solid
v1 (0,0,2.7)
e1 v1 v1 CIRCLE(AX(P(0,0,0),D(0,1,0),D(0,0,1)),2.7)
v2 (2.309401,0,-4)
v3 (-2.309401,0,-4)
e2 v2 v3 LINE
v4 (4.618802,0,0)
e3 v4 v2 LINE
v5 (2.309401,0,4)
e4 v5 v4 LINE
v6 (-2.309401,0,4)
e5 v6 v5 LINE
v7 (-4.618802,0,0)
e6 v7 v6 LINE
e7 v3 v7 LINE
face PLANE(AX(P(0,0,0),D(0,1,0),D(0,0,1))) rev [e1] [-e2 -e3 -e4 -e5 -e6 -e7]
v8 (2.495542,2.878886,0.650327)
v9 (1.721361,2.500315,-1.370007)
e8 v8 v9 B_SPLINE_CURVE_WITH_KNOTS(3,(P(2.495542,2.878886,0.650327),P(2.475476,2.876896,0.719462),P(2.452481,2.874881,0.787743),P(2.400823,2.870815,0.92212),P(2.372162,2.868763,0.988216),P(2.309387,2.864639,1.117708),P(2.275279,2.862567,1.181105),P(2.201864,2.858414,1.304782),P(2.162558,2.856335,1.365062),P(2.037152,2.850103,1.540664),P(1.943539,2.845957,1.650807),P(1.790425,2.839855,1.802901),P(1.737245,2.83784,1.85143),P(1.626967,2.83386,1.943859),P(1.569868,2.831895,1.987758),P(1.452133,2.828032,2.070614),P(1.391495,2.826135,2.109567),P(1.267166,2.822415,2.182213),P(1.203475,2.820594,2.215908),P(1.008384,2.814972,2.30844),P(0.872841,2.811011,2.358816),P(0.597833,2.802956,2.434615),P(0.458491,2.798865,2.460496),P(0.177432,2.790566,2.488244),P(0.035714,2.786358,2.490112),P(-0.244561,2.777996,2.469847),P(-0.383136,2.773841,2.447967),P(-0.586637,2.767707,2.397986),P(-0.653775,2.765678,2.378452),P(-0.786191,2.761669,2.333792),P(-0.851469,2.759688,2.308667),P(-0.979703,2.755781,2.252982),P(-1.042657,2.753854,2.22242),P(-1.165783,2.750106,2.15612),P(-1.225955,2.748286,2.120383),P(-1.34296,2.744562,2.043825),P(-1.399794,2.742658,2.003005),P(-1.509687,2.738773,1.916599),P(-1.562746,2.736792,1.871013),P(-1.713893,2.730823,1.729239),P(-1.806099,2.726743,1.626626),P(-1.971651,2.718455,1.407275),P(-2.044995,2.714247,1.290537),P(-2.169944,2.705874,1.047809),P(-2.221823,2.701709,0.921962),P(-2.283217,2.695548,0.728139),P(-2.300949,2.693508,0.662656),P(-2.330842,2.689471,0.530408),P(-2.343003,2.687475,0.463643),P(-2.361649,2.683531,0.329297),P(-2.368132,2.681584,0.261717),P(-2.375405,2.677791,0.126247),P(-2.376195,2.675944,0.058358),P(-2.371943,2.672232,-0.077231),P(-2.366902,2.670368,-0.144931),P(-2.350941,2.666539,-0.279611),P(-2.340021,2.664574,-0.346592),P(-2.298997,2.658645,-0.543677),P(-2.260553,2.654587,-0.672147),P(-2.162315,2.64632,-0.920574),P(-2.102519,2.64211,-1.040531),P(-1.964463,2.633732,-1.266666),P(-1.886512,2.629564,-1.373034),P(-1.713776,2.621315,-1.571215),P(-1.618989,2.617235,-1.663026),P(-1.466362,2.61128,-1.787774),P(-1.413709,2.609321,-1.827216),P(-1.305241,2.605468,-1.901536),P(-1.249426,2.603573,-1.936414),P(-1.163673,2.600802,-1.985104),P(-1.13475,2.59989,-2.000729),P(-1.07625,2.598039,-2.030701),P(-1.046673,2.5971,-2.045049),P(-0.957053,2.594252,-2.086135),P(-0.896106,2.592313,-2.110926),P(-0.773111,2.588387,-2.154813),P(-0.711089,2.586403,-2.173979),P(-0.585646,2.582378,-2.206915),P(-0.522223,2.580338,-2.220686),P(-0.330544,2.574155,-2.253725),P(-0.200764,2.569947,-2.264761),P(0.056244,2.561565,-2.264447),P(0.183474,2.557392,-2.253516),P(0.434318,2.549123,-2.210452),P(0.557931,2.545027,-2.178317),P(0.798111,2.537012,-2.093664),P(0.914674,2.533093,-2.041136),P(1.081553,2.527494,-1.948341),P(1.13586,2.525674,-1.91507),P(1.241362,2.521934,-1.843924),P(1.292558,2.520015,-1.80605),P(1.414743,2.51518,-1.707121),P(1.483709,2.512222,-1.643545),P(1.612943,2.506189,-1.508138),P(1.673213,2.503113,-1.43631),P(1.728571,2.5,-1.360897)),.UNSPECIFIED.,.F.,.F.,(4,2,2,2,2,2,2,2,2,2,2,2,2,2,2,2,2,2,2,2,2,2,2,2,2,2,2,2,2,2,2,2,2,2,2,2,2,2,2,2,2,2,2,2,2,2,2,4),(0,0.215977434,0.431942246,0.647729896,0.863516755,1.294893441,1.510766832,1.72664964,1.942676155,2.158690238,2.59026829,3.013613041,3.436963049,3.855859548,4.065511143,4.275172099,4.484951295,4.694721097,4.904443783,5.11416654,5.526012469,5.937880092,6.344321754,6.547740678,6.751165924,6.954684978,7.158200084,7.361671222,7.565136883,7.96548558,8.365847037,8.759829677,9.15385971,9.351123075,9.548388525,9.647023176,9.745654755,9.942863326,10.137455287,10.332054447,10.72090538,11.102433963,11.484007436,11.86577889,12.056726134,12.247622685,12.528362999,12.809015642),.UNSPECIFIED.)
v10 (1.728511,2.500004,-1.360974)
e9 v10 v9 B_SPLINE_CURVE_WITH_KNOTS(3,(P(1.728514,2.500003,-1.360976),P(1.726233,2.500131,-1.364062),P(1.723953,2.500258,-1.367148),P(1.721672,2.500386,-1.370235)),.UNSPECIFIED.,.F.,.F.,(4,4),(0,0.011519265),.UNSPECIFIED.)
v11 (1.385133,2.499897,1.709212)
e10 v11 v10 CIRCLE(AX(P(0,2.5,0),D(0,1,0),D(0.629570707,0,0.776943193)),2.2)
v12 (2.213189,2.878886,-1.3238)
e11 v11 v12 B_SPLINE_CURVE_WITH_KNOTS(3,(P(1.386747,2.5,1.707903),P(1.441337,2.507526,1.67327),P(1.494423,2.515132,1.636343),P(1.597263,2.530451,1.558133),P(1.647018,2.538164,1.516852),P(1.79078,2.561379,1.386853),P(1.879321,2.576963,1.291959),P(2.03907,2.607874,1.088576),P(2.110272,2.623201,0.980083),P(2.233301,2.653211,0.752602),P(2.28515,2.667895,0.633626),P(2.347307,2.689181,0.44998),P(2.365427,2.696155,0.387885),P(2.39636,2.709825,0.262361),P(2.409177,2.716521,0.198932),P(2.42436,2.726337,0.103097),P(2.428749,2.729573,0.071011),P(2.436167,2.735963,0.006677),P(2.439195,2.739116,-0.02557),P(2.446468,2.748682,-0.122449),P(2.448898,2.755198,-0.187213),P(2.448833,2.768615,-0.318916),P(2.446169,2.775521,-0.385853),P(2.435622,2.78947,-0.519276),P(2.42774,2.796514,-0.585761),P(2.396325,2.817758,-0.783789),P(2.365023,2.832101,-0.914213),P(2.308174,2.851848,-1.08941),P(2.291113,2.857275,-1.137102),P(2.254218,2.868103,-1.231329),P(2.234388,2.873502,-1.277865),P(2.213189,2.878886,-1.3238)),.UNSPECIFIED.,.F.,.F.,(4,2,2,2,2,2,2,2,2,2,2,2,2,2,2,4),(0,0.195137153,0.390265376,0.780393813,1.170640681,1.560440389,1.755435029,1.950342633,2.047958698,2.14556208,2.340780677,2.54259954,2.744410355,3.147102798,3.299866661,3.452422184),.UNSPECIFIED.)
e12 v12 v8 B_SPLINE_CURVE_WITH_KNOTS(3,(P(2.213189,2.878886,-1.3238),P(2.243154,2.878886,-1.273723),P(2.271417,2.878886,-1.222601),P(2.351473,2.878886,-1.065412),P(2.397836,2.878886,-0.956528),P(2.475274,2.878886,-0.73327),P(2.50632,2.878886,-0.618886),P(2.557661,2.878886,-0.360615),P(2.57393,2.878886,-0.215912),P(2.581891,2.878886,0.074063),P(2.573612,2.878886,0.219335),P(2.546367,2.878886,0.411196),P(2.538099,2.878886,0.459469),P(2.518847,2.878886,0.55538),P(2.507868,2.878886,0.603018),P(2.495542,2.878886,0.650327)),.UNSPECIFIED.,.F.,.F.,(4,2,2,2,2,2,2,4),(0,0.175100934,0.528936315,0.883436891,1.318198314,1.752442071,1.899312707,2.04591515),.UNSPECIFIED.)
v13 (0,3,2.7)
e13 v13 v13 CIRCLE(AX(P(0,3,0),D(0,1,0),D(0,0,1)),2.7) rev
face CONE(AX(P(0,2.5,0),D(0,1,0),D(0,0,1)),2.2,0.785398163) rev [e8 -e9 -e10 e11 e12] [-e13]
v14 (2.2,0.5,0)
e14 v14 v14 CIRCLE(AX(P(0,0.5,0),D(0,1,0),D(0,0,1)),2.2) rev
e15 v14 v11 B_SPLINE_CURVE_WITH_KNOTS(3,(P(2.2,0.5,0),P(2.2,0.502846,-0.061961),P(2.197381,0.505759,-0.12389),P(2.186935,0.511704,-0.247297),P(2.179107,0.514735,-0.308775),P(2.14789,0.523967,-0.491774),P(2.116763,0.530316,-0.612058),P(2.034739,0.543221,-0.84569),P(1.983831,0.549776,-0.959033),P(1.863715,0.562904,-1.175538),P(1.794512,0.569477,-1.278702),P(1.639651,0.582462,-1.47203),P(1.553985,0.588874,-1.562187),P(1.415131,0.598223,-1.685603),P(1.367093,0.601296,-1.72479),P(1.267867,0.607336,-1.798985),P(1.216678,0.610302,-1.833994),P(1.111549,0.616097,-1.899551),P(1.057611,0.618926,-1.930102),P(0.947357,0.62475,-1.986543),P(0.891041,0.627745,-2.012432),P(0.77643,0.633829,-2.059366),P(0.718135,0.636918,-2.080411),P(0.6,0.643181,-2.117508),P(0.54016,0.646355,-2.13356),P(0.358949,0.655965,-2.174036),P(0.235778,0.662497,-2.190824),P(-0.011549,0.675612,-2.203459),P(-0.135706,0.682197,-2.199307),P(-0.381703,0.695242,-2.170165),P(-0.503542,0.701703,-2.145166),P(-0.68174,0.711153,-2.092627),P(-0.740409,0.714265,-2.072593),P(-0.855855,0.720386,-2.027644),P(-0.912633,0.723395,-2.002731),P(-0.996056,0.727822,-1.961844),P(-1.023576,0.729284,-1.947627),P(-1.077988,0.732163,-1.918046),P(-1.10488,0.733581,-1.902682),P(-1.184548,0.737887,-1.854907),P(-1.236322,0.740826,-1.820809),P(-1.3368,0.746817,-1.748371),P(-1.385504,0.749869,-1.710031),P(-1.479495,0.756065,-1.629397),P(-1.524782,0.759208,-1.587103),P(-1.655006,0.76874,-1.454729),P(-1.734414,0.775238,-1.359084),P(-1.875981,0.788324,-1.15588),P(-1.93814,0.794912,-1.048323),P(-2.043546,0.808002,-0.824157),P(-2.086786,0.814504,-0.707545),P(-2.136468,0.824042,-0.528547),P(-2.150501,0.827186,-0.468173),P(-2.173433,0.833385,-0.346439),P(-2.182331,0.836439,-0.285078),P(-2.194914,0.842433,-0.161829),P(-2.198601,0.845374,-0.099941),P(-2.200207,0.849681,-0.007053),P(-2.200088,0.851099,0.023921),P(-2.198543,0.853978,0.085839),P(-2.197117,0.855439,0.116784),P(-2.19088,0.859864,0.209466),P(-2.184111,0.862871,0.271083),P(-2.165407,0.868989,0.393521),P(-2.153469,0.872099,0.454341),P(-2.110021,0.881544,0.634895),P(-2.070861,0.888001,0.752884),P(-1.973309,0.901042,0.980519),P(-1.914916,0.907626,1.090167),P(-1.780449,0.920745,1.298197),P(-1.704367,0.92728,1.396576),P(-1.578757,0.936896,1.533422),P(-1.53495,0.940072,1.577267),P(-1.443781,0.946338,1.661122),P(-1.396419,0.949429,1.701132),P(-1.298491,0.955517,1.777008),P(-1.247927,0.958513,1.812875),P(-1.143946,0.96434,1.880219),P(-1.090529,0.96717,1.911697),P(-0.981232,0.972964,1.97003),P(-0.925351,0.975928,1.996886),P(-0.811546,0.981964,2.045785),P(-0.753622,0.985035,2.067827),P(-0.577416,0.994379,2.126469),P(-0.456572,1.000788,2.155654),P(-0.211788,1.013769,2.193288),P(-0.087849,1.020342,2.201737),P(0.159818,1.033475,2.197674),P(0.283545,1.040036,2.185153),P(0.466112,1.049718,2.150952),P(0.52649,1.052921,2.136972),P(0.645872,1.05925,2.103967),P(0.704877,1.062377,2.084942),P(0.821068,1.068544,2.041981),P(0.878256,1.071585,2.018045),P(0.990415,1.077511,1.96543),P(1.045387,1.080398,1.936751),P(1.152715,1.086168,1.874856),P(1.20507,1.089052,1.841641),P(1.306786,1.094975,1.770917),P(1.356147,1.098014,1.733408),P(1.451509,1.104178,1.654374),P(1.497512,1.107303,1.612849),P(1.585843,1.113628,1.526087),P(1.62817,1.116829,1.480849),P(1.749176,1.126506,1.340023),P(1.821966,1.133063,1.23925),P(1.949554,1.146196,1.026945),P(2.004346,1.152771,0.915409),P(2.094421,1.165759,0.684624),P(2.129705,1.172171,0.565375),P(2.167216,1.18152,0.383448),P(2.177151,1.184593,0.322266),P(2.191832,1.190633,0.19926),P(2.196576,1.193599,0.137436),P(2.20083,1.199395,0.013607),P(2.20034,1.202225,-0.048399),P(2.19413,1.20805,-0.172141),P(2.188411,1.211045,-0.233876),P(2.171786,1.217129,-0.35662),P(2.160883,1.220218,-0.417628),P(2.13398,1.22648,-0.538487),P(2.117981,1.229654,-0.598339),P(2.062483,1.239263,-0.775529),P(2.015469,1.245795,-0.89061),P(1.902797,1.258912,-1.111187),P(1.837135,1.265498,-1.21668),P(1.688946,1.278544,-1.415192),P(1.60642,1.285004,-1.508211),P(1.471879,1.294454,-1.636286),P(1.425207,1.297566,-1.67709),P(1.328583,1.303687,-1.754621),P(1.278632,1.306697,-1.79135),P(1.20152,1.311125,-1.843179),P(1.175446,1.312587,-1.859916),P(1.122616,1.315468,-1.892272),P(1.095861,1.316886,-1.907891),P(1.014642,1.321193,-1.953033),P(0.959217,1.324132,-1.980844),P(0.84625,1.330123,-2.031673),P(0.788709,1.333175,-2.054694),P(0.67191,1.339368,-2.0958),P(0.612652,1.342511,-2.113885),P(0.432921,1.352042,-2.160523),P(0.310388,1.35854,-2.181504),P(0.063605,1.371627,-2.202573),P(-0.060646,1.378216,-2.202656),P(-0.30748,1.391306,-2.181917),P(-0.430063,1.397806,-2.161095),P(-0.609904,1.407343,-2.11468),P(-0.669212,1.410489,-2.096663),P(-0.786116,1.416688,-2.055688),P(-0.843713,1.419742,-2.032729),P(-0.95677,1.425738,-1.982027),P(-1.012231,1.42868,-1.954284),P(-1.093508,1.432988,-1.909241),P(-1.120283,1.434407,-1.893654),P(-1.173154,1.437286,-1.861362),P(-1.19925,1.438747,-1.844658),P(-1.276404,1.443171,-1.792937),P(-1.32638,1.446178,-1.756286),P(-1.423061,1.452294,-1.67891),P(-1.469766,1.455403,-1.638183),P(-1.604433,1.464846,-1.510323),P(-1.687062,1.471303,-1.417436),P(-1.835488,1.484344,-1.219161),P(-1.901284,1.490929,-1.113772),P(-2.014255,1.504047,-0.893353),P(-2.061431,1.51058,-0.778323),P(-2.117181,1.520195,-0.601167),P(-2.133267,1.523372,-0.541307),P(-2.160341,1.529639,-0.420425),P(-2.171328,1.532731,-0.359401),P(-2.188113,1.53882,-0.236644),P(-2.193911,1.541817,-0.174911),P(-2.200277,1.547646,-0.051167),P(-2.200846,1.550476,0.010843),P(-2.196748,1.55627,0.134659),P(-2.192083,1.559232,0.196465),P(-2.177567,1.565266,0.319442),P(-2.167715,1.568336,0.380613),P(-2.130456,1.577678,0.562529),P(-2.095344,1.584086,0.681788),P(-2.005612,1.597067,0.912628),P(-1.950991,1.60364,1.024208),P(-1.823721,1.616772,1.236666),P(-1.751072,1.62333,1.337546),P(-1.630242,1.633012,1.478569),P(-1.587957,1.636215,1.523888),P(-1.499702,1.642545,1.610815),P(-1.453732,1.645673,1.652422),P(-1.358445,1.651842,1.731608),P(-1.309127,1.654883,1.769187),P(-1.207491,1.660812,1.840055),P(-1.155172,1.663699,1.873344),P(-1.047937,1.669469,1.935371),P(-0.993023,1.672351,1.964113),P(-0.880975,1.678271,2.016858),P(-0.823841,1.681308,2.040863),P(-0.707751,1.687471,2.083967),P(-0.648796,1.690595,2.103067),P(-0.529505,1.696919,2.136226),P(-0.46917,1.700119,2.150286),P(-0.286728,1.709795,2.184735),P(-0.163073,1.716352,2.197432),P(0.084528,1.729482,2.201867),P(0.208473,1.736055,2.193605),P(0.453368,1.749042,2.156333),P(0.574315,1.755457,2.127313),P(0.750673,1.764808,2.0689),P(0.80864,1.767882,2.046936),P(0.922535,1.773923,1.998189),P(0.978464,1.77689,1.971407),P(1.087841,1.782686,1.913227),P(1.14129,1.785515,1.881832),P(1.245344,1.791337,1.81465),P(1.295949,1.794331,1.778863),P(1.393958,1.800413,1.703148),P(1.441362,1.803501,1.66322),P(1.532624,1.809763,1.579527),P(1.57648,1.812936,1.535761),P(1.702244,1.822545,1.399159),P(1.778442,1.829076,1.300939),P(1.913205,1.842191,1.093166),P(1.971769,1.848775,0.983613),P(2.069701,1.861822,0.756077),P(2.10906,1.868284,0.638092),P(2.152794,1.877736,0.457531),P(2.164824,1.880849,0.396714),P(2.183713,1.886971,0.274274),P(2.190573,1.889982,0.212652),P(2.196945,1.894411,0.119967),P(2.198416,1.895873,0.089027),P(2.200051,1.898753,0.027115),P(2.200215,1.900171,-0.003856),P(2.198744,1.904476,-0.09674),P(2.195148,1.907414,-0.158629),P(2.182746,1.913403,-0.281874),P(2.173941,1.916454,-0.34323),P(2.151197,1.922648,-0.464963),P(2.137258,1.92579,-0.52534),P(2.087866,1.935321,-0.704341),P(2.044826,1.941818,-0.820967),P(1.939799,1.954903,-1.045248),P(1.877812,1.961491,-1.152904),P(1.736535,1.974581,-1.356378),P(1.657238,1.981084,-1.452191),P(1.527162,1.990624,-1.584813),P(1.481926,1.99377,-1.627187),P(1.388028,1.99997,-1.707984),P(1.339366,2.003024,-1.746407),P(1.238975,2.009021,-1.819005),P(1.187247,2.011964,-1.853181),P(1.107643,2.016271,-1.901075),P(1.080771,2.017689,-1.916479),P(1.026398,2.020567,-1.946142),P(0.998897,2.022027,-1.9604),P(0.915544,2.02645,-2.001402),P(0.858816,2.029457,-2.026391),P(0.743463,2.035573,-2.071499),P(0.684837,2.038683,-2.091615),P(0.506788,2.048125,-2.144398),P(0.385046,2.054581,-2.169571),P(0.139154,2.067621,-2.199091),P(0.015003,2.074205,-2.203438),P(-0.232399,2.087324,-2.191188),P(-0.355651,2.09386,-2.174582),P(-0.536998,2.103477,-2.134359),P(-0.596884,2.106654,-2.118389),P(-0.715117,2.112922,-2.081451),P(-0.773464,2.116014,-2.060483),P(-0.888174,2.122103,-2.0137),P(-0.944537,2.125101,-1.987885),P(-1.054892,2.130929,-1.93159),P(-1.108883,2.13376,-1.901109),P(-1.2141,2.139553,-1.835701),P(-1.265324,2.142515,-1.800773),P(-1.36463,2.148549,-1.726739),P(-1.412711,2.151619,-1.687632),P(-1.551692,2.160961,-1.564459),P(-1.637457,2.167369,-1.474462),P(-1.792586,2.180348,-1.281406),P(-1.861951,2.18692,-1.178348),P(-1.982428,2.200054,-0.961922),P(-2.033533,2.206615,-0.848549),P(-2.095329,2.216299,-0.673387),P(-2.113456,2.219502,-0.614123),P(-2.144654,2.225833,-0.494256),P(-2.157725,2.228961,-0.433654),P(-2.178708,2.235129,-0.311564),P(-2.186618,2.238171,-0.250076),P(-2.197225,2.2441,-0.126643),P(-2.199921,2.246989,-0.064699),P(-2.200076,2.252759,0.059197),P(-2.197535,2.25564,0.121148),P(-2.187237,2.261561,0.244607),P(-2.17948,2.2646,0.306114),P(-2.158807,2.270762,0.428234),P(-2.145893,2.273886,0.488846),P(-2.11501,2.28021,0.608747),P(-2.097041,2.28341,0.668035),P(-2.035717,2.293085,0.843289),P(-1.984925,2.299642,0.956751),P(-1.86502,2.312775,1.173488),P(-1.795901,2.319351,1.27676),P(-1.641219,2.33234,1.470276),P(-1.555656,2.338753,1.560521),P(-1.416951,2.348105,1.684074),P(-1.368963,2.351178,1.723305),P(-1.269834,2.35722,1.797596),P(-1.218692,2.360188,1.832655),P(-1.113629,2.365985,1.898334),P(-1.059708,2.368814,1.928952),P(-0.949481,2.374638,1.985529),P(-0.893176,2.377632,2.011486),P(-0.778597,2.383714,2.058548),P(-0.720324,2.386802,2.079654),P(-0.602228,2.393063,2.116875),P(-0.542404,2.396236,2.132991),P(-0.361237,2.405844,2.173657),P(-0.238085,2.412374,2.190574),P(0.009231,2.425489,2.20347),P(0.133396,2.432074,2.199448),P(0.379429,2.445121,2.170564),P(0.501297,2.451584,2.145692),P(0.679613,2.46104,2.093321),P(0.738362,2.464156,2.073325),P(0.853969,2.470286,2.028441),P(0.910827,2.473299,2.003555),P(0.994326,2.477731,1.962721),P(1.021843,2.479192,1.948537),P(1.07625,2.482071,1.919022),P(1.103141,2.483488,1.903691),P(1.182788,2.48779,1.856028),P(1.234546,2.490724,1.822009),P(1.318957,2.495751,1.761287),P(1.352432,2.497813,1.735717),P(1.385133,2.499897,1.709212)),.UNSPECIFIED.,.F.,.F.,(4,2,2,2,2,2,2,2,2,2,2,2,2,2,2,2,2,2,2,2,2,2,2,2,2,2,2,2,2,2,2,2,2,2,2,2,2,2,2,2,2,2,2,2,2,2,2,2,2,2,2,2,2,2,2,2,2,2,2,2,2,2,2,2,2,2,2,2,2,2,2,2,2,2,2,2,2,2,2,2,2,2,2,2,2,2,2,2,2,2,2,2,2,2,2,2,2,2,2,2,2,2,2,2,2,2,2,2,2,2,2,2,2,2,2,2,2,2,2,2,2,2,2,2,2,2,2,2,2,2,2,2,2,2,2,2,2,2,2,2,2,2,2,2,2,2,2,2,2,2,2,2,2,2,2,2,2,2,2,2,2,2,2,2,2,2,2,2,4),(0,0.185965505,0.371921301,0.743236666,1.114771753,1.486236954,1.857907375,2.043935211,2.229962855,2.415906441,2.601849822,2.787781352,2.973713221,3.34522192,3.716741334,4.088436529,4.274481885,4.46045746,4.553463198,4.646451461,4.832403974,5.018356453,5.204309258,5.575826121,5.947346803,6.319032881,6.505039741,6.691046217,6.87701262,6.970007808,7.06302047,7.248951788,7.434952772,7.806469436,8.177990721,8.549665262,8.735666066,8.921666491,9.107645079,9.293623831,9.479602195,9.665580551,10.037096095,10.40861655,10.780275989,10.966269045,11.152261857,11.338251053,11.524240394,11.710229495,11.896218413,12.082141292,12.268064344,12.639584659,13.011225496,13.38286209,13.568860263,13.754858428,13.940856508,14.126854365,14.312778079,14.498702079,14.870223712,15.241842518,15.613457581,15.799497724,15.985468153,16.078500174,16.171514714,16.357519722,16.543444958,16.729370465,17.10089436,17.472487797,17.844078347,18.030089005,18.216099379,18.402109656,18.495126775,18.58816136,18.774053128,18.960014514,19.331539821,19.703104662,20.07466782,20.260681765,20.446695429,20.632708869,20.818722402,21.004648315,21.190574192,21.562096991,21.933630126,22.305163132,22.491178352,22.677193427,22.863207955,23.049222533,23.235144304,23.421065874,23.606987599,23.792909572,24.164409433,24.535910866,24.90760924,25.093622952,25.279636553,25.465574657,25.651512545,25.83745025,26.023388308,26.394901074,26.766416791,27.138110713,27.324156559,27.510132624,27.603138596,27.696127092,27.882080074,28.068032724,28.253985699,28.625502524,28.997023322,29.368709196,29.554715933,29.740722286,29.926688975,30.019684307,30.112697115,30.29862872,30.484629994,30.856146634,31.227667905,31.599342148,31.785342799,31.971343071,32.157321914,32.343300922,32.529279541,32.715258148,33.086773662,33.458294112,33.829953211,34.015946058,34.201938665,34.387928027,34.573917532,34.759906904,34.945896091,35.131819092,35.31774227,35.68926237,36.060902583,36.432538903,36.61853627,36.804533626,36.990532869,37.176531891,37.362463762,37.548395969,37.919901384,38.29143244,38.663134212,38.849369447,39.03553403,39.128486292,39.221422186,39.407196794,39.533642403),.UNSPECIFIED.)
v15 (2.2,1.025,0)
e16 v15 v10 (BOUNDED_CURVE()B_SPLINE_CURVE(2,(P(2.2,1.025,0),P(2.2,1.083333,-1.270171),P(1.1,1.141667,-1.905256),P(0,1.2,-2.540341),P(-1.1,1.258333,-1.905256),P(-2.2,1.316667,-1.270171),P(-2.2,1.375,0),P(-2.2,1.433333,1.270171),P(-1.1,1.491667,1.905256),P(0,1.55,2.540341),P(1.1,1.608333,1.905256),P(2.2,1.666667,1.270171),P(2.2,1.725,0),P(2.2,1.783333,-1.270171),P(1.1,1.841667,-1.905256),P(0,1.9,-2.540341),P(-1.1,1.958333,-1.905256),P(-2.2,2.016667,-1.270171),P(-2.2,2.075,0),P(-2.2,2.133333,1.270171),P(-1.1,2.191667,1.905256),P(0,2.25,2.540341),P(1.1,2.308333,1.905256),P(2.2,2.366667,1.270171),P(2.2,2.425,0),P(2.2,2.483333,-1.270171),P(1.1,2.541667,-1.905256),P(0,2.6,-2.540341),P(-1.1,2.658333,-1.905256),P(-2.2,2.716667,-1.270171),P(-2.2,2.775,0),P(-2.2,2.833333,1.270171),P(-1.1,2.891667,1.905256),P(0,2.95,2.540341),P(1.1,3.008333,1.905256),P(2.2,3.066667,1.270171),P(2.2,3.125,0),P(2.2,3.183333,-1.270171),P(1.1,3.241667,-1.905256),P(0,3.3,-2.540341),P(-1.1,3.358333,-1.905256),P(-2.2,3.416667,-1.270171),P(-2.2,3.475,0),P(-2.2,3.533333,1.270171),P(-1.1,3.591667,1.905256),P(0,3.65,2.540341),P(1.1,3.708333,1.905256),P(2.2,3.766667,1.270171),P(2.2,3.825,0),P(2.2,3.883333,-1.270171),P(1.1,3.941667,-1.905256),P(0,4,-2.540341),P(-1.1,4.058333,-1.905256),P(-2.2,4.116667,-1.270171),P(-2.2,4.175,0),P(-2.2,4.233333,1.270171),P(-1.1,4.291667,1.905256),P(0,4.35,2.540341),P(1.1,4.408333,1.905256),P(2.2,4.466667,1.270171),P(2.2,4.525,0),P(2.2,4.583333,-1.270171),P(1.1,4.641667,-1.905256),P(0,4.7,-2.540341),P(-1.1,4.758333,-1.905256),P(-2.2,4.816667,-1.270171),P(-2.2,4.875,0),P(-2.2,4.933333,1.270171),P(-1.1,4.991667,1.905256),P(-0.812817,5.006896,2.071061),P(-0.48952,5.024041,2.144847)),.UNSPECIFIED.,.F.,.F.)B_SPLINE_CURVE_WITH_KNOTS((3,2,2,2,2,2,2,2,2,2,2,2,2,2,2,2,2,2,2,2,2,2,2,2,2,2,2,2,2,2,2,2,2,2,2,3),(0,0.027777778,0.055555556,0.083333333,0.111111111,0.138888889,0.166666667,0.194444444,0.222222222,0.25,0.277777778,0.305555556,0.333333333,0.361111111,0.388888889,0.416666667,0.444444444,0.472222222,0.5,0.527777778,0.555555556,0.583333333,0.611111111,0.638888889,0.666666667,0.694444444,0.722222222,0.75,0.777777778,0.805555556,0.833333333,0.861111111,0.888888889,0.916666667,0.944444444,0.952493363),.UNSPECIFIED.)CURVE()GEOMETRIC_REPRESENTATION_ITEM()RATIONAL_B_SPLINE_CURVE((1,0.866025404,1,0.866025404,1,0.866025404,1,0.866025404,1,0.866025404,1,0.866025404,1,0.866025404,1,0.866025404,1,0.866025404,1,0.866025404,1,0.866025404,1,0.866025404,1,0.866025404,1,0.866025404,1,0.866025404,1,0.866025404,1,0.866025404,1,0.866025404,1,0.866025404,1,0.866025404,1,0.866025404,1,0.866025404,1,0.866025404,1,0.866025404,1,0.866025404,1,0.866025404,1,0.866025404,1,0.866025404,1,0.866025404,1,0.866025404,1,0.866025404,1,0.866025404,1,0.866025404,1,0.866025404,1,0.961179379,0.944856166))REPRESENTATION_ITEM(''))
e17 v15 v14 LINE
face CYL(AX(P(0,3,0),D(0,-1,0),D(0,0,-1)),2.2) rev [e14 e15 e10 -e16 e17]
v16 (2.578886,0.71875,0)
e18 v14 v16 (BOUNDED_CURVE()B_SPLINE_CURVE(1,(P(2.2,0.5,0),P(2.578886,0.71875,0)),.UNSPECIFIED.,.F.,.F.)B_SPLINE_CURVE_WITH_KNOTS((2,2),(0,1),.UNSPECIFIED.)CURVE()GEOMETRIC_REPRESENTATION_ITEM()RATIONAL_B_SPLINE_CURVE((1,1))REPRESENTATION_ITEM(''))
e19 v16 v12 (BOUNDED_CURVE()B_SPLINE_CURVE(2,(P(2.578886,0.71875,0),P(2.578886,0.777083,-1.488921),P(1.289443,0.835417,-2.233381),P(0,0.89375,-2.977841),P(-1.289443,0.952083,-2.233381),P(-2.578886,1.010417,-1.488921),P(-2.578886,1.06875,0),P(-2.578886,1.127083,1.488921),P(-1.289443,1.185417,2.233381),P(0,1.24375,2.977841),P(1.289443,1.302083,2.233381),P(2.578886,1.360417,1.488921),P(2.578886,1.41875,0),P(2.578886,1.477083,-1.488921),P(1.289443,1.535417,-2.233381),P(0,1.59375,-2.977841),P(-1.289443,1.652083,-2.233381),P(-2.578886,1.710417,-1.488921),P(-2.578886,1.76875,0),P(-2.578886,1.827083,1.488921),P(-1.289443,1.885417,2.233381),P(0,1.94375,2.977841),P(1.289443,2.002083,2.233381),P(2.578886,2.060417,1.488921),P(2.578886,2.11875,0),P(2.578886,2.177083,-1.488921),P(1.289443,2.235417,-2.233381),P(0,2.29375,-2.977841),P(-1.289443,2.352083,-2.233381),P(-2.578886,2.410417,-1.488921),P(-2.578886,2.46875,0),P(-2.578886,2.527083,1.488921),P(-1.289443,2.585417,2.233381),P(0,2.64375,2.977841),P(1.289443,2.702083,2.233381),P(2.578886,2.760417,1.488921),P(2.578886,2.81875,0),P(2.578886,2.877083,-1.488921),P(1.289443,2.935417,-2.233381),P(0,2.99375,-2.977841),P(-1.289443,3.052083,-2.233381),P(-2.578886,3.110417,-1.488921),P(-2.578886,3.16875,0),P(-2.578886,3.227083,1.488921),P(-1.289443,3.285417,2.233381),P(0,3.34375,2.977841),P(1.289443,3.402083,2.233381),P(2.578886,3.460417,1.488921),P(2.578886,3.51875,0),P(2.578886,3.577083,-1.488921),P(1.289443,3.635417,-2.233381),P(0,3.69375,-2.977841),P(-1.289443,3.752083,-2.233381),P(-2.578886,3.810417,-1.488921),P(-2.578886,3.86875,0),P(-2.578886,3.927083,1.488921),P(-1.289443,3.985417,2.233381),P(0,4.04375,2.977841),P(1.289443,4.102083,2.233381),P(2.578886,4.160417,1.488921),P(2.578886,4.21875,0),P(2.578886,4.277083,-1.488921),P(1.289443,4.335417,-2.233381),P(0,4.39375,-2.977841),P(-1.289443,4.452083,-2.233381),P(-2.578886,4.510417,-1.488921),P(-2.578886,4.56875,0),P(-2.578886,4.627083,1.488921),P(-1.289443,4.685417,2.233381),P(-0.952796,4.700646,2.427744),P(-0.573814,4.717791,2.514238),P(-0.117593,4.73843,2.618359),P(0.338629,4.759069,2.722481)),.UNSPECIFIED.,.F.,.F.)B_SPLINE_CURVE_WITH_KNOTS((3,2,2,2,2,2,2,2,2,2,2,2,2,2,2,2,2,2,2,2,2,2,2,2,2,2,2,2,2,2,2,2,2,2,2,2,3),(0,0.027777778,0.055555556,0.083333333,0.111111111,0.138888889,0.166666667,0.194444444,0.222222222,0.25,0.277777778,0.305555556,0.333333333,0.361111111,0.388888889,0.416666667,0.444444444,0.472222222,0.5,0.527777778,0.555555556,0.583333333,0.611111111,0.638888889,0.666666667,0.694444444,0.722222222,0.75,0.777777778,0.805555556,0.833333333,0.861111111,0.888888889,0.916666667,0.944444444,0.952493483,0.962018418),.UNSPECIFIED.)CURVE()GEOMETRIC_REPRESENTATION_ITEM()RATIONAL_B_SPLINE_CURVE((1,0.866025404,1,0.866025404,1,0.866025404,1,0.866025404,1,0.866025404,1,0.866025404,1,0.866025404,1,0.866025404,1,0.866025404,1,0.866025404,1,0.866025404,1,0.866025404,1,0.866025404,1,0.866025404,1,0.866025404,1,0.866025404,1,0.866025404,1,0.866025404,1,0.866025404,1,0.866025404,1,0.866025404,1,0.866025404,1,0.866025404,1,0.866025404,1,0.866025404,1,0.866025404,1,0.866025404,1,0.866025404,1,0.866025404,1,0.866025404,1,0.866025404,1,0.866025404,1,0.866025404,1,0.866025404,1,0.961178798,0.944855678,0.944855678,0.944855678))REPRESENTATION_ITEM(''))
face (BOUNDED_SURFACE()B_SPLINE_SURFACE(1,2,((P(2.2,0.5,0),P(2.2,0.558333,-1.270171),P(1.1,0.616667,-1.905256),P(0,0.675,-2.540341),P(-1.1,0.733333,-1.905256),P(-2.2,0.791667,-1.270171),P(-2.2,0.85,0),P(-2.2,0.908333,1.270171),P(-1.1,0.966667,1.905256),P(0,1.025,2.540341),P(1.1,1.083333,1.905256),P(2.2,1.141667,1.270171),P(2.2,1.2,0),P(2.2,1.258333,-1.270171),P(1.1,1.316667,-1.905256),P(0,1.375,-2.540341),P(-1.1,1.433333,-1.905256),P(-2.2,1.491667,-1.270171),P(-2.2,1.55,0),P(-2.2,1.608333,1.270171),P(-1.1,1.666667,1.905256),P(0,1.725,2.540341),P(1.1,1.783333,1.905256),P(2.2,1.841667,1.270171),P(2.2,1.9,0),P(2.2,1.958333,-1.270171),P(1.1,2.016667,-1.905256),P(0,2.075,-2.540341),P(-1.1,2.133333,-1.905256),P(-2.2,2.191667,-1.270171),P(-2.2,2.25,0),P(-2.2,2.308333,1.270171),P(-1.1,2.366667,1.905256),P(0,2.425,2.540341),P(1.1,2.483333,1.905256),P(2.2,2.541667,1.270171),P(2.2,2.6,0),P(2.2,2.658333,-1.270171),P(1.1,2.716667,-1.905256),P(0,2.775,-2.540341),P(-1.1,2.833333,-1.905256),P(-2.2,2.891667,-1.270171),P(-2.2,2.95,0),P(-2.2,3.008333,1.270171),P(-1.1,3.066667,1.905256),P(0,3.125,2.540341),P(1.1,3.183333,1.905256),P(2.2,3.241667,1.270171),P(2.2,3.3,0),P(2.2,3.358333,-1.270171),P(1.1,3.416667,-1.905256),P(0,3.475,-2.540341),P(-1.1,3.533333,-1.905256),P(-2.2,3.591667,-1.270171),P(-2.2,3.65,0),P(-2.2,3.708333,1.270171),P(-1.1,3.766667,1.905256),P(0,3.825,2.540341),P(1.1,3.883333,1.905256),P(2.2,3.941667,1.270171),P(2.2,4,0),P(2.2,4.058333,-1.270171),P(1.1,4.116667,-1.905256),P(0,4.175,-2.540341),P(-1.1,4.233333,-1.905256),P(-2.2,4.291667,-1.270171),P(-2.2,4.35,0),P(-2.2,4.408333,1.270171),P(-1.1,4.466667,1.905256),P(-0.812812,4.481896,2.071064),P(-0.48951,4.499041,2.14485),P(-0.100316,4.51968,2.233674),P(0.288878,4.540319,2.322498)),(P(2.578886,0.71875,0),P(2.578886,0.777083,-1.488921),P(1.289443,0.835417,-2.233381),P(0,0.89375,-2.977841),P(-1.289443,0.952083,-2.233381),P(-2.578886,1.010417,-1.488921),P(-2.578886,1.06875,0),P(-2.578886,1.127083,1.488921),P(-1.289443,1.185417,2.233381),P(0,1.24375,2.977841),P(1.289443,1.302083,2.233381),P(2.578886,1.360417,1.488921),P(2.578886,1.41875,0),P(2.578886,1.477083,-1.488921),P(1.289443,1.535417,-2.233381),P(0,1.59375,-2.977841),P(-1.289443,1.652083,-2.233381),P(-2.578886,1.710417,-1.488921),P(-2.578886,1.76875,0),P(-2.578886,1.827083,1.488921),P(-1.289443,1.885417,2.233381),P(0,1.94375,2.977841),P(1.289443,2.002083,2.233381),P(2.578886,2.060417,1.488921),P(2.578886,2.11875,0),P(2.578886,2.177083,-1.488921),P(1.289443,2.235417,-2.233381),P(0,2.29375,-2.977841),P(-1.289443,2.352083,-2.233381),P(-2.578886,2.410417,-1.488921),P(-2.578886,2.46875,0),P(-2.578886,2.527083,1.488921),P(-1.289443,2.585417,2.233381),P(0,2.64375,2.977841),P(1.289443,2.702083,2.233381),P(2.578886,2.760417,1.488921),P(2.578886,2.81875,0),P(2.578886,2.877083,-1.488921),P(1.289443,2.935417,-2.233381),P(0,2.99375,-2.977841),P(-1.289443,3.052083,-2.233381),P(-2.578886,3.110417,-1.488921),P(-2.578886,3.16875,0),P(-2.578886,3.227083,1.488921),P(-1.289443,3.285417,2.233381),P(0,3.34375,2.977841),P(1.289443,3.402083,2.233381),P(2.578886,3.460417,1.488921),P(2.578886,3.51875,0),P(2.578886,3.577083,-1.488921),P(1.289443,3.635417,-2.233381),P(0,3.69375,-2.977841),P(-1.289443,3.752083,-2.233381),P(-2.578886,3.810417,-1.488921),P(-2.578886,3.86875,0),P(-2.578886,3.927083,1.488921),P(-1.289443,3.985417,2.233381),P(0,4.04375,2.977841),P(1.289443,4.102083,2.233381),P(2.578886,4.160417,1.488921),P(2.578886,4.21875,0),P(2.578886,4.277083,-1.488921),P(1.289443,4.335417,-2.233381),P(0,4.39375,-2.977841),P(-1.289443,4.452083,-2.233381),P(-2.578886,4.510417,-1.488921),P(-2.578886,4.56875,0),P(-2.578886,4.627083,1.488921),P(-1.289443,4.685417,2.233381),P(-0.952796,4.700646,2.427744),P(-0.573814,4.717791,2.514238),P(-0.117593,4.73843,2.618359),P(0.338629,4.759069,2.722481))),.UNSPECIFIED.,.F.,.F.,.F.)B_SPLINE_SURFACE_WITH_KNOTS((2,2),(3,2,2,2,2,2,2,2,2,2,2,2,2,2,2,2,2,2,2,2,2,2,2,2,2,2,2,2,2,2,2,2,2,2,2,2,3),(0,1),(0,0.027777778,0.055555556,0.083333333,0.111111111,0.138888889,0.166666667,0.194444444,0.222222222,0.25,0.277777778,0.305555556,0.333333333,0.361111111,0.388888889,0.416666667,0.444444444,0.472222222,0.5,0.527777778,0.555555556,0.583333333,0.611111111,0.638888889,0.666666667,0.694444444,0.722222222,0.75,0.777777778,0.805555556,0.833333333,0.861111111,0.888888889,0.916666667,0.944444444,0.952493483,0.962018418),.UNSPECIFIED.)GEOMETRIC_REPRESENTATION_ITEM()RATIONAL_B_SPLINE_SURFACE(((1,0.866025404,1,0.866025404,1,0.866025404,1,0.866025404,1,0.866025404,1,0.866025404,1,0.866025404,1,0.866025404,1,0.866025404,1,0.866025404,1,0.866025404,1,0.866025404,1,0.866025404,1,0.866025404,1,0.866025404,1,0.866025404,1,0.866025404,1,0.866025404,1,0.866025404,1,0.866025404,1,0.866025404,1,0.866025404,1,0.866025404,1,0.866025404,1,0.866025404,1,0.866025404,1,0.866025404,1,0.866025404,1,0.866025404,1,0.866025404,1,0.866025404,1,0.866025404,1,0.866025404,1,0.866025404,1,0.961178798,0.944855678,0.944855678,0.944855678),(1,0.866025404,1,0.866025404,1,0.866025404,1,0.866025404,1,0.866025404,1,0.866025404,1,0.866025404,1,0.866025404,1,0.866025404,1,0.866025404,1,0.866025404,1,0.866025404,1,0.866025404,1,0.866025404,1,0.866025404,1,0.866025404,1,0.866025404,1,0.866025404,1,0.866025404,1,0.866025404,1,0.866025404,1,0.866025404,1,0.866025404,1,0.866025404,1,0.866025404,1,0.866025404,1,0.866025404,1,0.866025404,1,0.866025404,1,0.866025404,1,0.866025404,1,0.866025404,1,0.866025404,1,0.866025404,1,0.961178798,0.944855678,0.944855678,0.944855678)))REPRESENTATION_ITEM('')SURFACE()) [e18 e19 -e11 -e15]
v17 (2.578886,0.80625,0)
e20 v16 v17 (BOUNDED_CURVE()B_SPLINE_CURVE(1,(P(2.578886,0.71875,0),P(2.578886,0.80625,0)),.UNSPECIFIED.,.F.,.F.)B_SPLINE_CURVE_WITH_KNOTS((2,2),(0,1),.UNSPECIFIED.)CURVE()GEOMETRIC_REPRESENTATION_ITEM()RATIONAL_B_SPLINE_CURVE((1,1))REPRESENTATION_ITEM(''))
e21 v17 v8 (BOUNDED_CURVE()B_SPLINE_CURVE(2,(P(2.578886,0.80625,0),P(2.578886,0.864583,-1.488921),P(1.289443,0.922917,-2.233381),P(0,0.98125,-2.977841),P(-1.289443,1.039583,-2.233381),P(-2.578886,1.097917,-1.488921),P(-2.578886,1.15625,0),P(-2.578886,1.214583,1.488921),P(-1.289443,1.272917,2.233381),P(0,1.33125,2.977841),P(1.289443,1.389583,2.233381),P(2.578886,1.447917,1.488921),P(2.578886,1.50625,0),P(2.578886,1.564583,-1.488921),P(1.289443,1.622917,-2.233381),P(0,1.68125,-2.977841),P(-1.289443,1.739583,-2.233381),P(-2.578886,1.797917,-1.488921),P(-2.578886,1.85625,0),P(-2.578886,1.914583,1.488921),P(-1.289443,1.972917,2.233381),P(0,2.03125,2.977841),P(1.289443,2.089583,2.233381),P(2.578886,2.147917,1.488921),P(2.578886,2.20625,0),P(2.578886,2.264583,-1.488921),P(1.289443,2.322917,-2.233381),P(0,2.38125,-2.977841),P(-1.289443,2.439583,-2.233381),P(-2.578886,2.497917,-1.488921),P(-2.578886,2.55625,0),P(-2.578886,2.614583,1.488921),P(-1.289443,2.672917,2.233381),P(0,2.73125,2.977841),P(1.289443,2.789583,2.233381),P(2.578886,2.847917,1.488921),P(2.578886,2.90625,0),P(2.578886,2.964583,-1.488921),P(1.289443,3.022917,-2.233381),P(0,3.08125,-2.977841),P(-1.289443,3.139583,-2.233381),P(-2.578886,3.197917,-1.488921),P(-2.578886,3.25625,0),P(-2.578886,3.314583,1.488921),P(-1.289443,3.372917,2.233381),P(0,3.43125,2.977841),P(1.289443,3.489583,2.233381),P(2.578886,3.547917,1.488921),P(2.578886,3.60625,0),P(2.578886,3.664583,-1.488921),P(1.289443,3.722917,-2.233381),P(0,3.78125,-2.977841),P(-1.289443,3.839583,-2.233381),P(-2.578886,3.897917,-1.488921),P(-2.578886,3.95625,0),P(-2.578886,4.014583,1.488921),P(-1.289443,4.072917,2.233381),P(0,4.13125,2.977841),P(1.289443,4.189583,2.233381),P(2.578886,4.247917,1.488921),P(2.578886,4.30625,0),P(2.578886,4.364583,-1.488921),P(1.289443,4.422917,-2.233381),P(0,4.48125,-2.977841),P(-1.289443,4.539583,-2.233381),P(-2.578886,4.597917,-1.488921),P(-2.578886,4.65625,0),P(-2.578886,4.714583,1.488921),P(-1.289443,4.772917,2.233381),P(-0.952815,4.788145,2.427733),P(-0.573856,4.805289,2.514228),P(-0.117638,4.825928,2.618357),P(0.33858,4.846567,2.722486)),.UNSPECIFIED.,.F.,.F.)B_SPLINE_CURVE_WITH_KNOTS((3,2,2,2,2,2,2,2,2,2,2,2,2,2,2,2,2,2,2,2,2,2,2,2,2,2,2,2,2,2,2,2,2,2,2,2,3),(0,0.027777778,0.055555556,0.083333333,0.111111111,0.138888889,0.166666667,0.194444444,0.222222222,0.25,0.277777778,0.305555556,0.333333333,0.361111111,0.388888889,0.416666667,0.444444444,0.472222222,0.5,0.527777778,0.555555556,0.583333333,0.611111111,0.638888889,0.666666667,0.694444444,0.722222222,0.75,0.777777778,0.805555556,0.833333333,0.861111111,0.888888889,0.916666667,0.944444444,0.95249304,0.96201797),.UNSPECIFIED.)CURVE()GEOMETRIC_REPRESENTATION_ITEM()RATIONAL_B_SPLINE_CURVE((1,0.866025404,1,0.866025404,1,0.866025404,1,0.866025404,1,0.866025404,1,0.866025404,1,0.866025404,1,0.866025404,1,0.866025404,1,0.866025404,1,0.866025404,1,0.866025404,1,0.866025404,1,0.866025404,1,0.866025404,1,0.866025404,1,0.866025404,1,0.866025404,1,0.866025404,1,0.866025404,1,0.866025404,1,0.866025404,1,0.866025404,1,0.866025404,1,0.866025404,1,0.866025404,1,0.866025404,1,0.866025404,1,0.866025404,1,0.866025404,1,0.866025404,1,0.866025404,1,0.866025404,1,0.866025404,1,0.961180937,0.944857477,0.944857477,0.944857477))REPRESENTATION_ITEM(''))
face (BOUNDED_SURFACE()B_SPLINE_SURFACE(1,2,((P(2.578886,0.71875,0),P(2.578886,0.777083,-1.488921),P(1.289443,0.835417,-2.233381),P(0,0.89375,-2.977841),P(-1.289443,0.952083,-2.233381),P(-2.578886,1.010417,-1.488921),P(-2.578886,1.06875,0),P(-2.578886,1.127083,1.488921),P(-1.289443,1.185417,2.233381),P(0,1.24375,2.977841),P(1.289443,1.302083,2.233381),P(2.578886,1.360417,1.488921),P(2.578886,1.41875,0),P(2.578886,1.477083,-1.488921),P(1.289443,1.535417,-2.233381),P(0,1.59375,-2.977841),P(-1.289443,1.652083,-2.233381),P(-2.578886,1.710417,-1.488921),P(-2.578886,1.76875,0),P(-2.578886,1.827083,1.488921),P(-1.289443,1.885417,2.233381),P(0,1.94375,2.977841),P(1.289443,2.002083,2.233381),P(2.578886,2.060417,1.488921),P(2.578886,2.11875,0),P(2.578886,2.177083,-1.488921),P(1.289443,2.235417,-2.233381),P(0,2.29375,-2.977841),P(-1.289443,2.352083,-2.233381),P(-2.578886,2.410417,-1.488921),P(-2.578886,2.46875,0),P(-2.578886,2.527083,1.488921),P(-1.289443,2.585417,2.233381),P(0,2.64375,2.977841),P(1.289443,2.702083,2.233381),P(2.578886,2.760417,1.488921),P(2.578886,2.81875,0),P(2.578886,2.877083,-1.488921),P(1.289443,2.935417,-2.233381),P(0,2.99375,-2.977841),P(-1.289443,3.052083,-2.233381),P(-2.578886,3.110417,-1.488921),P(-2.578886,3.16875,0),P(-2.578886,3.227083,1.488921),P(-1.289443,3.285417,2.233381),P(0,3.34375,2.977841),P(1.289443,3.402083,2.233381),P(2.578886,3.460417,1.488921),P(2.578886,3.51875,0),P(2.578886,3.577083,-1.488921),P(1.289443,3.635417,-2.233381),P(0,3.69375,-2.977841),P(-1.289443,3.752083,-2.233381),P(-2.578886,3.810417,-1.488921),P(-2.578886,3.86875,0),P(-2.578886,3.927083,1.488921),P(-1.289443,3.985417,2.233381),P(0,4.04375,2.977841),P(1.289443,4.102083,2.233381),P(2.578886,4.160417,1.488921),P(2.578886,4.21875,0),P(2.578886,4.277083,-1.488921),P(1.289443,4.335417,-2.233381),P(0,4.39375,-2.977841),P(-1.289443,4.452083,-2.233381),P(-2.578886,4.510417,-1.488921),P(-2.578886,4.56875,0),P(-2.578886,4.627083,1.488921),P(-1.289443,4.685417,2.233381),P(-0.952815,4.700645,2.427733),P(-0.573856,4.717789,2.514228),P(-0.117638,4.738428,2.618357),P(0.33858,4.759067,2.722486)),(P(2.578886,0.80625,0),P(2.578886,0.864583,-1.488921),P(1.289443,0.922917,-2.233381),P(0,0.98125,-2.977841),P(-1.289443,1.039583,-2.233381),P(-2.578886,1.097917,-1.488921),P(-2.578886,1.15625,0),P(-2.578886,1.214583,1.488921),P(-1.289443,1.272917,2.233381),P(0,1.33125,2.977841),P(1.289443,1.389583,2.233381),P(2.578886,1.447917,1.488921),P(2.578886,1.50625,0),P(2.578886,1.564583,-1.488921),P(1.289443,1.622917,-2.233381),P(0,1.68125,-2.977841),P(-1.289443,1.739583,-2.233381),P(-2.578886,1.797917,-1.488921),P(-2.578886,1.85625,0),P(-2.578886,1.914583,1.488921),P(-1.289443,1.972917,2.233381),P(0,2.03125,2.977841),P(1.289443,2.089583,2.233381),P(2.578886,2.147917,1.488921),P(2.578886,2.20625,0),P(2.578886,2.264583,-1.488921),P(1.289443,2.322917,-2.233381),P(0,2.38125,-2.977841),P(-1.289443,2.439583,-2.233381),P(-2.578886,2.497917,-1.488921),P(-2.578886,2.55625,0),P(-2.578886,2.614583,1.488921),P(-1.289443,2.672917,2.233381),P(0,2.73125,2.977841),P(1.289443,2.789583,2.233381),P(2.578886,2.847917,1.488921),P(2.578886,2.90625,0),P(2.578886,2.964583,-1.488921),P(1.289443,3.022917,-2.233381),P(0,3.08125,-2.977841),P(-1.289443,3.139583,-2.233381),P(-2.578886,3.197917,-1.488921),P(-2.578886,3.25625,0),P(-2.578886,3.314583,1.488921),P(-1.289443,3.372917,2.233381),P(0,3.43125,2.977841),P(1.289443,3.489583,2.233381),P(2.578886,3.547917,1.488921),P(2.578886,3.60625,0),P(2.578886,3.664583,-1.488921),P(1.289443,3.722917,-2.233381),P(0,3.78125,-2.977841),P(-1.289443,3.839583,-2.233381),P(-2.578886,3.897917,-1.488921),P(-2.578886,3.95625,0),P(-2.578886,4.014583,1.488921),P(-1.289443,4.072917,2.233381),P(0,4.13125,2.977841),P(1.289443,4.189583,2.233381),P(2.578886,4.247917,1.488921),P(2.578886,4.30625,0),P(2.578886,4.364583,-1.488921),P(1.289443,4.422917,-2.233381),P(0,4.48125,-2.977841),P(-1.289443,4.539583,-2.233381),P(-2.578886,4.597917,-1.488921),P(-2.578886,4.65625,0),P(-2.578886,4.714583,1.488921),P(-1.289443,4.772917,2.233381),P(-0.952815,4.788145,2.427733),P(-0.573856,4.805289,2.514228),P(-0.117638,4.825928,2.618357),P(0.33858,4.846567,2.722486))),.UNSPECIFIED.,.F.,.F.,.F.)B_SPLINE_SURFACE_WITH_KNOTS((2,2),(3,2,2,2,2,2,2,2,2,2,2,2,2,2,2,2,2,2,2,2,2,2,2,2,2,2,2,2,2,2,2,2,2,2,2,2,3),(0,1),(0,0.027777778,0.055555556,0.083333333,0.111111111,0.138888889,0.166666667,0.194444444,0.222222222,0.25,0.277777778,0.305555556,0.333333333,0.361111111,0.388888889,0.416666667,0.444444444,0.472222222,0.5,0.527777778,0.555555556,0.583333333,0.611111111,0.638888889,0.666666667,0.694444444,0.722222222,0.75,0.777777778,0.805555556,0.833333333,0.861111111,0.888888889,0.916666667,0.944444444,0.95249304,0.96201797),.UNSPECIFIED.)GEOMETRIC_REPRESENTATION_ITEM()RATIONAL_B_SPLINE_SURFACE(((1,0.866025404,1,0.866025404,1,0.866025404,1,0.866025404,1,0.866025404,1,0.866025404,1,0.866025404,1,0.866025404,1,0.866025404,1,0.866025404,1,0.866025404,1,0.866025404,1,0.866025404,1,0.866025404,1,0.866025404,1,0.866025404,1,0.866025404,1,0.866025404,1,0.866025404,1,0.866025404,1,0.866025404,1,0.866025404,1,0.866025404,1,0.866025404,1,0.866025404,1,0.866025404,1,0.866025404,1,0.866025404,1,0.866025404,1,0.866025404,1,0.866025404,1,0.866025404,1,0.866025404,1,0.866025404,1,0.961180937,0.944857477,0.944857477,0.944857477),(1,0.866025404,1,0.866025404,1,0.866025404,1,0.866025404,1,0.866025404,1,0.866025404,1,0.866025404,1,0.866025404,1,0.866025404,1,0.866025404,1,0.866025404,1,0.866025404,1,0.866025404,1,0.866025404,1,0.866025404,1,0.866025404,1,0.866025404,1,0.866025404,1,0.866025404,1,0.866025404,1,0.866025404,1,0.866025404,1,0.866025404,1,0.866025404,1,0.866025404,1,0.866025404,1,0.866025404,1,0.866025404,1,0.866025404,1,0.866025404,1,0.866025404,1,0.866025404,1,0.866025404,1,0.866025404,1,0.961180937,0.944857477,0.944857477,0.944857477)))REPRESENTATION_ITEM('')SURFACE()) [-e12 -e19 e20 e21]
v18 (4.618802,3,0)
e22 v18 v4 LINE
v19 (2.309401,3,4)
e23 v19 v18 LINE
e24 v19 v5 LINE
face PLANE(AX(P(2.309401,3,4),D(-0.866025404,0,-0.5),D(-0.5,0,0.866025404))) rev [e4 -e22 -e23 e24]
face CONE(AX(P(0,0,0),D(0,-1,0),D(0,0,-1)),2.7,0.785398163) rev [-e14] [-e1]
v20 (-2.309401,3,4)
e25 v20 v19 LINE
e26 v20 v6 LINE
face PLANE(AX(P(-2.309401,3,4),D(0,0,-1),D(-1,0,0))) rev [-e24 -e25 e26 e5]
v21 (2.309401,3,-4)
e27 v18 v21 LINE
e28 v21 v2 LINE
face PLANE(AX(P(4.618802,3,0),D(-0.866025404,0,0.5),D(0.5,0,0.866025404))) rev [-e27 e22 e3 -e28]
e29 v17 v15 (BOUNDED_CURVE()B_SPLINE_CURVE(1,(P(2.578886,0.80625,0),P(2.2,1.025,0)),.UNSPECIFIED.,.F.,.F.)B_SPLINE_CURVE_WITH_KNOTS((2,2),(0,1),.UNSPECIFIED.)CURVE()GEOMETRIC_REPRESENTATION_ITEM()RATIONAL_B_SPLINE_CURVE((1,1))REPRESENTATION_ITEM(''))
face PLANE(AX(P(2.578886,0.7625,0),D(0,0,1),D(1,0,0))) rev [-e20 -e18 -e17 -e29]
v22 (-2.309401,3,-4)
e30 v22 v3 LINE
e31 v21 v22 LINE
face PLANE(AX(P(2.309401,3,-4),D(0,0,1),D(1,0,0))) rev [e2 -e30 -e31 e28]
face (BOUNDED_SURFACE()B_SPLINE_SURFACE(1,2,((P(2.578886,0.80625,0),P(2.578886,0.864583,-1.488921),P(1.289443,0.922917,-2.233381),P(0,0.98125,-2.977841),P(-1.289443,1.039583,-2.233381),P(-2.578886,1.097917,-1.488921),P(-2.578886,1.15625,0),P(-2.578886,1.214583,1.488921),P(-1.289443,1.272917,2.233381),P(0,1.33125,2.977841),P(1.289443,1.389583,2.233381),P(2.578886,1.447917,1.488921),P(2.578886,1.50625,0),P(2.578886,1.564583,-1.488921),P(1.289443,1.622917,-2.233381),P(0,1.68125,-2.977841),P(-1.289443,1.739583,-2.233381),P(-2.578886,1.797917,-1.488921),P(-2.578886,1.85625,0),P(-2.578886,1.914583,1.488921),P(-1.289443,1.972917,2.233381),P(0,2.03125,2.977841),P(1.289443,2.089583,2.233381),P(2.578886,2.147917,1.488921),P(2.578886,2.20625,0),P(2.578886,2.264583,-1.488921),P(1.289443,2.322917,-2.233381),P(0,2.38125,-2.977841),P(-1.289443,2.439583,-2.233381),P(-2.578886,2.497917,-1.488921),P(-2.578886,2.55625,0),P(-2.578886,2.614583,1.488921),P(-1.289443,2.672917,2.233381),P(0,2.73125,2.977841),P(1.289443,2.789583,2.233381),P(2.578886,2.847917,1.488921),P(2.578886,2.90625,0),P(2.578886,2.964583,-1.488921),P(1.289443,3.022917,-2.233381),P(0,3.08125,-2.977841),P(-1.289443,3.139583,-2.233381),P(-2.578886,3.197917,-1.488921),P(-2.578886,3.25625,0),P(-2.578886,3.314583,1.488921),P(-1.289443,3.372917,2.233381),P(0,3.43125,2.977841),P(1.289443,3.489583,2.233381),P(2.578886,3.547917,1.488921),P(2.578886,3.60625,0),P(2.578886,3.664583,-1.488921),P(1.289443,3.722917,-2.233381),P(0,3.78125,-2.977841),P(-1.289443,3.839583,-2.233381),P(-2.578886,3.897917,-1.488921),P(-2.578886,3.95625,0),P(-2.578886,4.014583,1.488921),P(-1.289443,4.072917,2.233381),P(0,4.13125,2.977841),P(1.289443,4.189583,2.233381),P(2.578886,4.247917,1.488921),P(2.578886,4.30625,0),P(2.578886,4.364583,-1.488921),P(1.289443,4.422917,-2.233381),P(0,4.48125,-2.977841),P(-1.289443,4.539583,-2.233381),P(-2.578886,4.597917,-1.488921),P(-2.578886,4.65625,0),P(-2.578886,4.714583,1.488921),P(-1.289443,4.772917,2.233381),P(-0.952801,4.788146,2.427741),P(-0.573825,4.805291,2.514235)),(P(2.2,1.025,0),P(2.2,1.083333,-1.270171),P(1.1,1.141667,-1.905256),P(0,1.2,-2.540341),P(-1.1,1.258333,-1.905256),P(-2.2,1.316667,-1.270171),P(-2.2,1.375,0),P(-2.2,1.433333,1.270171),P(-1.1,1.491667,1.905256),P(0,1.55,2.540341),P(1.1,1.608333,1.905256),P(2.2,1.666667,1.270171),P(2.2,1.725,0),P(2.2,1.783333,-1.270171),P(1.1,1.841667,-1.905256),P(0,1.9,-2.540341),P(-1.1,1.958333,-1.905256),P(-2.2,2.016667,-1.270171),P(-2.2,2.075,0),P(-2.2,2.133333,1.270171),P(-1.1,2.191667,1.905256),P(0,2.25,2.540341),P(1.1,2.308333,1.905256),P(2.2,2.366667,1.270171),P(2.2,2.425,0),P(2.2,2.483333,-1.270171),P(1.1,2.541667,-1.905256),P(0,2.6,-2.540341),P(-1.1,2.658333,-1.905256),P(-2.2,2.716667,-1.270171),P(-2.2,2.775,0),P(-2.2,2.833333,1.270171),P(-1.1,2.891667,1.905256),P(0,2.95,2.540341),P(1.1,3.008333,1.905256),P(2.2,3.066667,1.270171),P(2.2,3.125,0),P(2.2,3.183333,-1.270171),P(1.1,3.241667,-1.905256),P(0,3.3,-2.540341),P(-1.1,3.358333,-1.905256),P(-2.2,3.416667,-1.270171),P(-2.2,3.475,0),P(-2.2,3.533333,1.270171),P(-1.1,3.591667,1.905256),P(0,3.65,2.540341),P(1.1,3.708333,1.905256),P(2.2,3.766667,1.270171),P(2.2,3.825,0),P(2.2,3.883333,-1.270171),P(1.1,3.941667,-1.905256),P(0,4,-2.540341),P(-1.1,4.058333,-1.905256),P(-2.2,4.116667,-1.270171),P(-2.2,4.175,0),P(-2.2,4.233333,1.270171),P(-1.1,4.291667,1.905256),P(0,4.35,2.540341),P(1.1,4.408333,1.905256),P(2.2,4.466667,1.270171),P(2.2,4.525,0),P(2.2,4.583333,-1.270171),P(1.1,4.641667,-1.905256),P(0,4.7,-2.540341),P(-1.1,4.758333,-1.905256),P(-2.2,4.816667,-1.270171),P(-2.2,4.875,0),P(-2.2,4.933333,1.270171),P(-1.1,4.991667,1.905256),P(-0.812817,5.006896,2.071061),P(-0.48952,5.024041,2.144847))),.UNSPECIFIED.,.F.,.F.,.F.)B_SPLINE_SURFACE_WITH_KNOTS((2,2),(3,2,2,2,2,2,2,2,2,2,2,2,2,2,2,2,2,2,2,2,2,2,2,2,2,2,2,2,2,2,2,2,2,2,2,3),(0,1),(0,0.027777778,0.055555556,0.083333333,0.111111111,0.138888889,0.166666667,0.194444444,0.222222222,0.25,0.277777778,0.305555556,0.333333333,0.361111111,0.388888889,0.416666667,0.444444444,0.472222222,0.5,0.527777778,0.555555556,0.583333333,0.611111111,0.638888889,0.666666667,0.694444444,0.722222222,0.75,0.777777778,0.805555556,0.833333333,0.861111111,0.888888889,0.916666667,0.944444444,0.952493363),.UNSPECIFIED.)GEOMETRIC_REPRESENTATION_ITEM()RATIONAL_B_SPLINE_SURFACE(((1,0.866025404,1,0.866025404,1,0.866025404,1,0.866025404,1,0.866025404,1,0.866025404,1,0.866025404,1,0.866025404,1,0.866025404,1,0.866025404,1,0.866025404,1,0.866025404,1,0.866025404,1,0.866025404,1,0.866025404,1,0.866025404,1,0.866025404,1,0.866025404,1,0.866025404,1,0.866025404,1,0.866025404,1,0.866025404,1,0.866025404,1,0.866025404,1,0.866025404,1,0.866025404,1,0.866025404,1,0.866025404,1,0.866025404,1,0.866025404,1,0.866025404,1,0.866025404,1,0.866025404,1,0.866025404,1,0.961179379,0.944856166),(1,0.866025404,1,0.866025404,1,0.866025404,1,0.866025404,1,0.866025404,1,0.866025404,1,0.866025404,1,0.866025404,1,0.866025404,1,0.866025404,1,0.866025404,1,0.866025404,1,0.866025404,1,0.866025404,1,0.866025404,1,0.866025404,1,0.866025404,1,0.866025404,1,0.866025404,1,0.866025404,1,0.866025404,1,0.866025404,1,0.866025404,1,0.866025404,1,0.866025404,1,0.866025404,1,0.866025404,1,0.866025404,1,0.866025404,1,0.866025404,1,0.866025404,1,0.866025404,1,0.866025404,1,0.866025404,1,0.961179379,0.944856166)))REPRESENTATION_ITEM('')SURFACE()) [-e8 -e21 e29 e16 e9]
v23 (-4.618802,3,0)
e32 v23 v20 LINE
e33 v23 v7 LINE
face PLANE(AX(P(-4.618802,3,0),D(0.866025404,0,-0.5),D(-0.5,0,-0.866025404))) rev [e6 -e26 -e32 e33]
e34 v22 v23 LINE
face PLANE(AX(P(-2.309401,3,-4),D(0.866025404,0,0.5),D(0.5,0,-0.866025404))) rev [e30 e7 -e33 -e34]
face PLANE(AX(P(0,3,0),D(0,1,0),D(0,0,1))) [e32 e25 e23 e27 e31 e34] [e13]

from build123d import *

# Parameters (mm, degrees)
SKETCH2_R           = 2.2
BOSS_EXTRUDE1_DEPTH = 3
CHAMFER1_SIZE       = 0.5
THREAD1_PITCH       = 0.7


with BuildPart() as part:
    # Sketch2 → Boss-Extrude1 (new body)
    with BuildSketch(Plane(origin=(0, 0, 0), x_dir=(1, 0, 0), z_dir=(0, 1, 0))):
        Polygon((4.618802154, 0), (2.309401077, 4), (-2.309401077, 4), (-4.618802154, 0), (-2.309401077, -4), (2.309401077, -4), align=None)
        with Locations(Location((0, 0, 0), (0, 0, 270))):
            Circle(SKETCH2_R, mode=Mode.SUBTRACT)
    extrude(amount=BOSS_EXTRUDE1_DEPTH)

    # Chamfer1
    chamfer1_edges = [part.edges().sort_by_distance(p)[0] for p in [
        (0, 0, -2.2),
        (0, 3, -2.2),
    ]]
    chamfer(chamfer1_edges, length=CHAMFER1_SIZE)

    # Thread1: the profile of Thread Profile1 profile screwed along a right-hand helix of 5.714286 turns, 6 arcs to a turn; built about Z, then put on its axis
    thread1_z = Axis((0, 0, 0), (0, 0, 1))
    thread1_corners = [(2.1997, 0, -0.000173205), (2.578886113, 0, 0.218749999), (2.578886113, 0, 0.306249999), (2.1997, 0, 0.525173203)]
    with BuildLine(mode=Mode.PRIVATE) as thread1_profile:
        Line(thread1_corners[0], thread1_corners[1])
        Line(thread1_corners[1], thread1_corners[2])
        Line(thread1_corners[2], thread1_corners[3])
        Line(thread1_corners[3], thread1_corners[0])
    thread1_cap = Face(thread1_profile.wire())
    thread1_turn_angles = [0, 30, 60, 90, 120, 150, 180, 210, 240, 270, 300, 330, 360]
    thread1_turn_weights = [1, 0.8660254037844387, 1, 0.8660254037844387, 1, 0.8660254037844387, 1, 0.8660254037844387, 1, 0.8660254037844387, 1, 0.8660254037844387, 1]
    thread1_turn_rails = [Edge.make_bspline([Vector(p[0], p[1], 0).rotate(thread1_z, thread1_turn_angles[k]) / thread1_turn_weights[k] + Vector(0, 0, p[2] + THREAD1_PITCH * thread1_turn_angles[k] / 360) for k in range(13)], [0, 0, 0, 1, 1, 2, 2, 3, 3, 4, 4, 5, 5, 6, 6, 6], 2, thread1_turn_weights) for p in thread1_corners]
    thread1_turn_sides = [Face.make_surface_from_curves(thread1_turn_rails[p[0]], thread1_turn_rails[p[1]]) for p in [(0, 1), (1, 2), (2, 3), (3, 0)]]
    thread1_last_angles = [1800, 1830, 1860, 1890, 1920, 1950, 1980, 2010, 2040, 2048.571428571, 2057.142857143]
    thread1_last_weights = [1, 0.8660254037844387, 1, 0.8660254037844387, 1, 0.8660254037844387, 1, 0.8660254037844387, 1, 0.9888308262251283, 1]
    thread1_last_rails = [Edge.make_bspline([Vector(p[0], p[1], 0).rotate(thread1_z, thread1_last_angles[k]) / thread1_last_weights[k] + Vector(0, 0, p[2] + THREAD1_PITCH * thread1_last_angles[k] / 360) for k in range(11)], [0, 0, 0, 1, 1, 2, 2, 3, 3, 4, 4, 5, 5, 5], 2, thread1_last_weights) for p in thread1_corners]
    thread1_last_sides = [Face.make_surface_from_curves(thread1_last_rails[p[0]], thread1_last_rails[p[1]]) for p in [(0, 1), (1, 2), (2, 3), (3, 0)]]
    thread1 = Plane(origin=(0, 0.5, 0), x_dir=(1, 0, 0), z_dir=(0, 1, 0)) * Solid(Shell([*[p.moved(Location((0, 0, THREAD1_PITCH * i))) for i in range(5) for p in thread1_turn_sides], *thread1_last_sides, thread1_cap, thread1_cap.rotate(thread1_z, 2057.142857143).moved(Location((0, 0, THREAD1_PITCH * 2057.142857143 / 360)))]))
    add(thread1, mode=Mode.SUBTRACT)


solid = part.part
